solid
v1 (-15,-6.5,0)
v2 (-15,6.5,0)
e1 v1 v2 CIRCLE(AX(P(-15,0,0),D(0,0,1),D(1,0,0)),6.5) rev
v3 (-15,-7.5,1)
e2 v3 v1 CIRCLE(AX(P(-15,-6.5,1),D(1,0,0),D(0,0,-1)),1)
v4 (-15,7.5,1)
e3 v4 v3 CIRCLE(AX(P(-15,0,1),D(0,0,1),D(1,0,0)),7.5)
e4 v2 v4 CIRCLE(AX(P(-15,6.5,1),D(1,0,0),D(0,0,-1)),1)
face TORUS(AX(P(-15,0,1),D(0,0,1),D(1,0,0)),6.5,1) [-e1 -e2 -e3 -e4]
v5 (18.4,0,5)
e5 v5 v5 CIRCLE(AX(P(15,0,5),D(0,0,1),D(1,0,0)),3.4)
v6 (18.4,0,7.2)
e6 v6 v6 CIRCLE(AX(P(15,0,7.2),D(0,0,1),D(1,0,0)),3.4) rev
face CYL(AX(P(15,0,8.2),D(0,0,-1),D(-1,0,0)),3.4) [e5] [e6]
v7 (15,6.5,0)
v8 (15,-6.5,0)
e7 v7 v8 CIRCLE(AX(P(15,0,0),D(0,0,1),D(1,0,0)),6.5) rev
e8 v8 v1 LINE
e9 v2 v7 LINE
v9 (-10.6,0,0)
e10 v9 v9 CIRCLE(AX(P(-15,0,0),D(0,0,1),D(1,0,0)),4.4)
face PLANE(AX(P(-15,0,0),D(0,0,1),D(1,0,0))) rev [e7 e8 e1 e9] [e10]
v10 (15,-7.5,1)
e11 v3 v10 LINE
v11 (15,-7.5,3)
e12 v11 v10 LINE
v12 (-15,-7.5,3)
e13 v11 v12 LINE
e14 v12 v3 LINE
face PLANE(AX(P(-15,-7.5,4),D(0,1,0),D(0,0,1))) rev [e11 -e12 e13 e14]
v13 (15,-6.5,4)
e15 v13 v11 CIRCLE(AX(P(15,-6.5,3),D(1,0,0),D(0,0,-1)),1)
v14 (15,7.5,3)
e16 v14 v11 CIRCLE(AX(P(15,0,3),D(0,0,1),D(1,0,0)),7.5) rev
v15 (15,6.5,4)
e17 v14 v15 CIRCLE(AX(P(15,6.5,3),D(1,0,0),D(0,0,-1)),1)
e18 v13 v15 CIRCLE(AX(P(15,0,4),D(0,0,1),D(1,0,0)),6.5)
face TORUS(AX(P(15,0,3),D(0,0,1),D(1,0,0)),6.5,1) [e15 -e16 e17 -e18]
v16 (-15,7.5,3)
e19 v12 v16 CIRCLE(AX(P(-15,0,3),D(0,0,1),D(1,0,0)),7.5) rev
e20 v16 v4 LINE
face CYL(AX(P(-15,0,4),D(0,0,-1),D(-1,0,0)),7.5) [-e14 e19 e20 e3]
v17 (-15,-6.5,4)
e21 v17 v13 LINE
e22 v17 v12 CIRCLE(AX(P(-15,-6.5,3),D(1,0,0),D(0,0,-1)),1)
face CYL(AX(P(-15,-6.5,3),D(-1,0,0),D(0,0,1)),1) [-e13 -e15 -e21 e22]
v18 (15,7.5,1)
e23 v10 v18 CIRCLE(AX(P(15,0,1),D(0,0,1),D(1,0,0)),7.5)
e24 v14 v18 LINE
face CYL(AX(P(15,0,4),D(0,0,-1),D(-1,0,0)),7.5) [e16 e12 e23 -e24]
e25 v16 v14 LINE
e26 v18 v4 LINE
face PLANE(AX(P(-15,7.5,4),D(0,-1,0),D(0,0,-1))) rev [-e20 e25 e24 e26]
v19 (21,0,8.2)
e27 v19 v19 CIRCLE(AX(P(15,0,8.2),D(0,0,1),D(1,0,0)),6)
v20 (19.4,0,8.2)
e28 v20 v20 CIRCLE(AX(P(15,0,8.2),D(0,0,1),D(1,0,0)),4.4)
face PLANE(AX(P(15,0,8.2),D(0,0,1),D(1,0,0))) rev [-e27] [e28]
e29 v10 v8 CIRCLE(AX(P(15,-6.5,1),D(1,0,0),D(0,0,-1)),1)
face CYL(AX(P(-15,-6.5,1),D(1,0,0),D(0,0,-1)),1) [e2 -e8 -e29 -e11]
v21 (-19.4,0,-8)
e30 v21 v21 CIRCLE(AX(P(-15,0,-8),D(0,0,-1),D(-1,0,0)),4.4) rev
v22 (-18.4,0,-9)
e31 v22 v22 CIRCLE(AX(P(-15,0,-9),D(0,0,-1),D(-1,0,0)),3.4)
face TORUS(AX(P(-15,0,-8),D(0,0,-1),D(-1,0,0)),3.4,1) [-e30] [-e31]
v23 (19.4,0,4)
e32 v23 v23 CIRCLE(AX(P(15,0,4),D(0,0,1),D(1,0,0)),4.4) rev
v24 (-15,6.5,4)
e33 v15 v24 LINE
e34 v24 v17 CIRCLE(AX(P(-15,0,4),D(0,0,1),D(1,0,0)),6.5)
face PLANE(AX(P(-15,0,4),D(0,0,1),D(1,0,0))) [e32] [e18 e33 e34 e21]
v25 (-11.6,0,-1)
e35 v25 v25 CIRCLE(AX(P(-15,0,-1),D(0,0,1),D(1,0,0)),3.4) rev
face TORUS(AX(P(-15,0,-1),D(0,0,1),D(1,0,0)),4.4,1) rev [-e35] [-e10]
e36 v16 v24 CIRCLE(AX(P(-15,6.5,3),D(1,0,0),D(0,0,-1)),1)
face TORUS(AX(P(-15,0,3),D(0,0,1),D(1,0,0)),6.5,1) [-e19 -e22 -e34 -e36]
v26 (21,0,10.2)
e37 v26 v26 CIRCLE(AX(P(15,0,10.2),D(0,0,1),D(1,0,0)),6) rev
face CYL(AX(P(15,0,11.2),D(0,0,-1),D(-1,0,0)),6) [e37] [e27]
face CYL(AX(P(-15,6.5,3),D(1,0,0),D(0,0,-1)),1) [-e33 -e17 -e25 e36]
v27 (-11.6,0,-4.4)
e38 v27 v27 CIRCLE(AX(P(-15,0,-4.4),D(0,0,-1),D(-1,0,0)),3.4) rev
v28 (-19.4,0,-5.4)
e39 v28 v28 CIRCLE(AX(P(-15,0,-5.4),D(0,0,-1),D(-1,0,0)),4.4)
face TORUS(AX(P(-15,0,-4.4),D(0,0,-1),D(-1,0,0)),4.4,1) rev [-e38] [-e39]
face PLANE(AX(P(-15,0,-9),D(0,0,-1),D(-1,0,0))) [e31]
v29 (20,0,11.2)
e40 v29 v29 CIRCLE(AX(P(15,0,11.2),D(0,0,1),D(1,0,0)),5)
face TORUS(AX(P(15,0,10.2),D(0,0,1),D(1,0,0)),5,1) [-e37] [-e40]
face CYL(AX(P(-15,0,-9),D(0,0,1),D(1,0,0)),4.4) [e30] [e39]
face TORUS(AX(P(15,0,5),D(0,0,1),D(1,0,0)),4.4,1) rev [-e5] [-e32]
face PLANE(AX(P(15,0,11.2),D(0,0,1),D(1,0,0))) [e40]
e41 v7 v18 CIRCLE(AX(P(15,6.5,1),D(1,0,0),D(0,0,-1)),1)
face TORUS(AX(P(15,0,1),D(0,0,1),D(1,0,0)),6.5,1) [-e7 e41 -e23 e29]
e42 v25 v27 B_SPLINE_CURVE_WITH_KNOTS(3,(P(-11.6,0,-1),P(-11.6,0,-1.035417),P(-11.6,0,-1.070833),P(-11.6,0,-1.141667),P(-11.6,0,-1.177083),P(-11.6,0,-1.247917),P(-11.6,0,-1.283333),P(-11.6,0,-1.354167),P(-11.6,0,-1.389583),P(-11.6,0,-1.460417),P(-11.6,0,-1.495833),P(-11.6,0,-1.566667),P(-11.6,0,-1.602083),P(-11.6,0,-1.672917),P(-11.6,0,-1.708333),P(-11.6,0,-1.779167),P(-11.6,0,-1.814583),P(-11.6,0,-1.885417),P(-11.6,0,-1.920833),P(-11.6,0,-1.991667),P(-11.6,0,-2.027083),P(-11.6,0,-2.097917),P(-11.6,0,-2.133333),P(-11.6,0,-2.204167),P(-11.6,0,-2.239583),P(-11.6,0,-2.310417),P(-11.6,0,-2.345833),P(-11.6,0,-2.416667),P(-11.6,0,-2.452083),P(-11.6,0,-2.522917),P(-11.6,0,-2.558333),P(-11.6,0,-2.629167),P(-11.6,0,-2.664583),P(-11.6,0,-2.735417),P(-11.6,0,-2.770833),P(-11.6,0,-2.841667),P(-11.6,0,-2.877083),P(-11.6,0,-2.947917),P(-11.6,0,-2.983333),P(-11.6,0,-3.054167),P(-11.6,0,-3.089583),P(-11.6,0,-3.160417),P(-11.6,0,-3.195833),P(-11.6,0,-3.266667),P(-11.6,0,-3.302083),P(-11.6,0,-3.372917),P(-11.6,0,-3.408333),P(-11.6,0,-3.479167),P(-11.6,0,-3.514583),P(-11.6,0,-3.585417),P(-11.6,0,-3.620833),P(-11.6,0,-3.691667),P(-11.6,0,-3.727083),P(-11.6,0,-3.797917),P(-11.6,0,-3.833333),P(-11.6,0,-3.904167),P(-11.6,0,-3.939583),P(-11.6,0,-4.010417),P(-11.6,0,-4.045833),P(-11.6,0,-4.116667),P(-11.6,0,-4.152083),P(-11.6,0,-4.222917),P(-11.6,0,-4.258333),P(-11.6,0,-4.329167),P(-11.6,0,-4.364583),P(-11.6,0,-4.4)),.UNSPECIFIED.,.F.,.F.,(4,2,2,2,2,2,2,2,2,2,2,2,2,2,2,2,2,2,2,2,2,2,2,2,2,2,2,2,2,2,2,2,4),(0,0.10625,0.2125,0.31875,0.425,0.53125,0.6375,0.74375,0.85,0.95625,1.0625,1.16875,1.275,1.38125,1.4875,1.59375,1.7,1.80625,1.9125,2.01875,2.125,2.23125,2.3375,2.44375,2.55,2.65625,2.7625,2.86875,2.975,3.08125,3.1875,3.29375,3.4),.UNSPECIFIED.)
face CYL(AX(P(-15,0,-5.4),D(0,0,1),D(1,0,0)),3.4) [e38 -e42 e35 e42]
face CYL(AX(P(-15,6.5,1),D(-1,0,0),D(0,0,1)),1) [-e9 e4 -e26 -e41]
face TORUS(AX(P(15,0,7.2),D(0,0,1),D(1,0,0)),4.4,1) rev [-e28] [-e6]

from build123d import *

# Parameters (mm, degrees)
SKETCH1_R           = 3.5
BOSS_EXTRUDE2_DEPTH = 4
SKETCH2_R           = 3.4
BOSS_EXTRUDE3_DEPTH = 5.4
SKETCH4_R           = 4.4
BOSS_EXTRUDE4_DEPTH = 3.6
SKETCH5_R           = 3.5
BOSS_EXTRUDE5_DEPTH = 4
SKETCH6_R           = 3.4
BOSS_EXTRUDE6_DEPTH = 4.2
SKETCH7_R           = 6
BOSS_EXTRUDE7_DEPTH = 3
FILLET1_R           = 1


with BuildPart() as part:
    # Sketch1 → Boss-Extrude2 (new body)
    with BuildSketch(Plane.XY):
        with BuildLine():
            Line((-15, 7.5), (15, 7.5))
            ThreePointArc((15, 7.5), (22.5, 0), (15, -7.5))
            Line((15, -7.5), (-15, -7.5))
            ThreePointArc((-15, -7.5), (-22.5, 0), (-15, 7.5))
        make_face()
        with Locations((15, 0)):
            Circle(SKETCH1_R, mode=Mode.SUBTRACT)
    extrude(amount=BOSS_EXTRUDE2_DEPTH)

    # Sketch2 → Boss-Extrude3 (add)
    with BuildSketch(Plane(origin=(0, 0, 0), x_dir=(-1, 0, 0), z_dir=(0, 0, -1))):
        with Locations(Location((15, 0, 0), (0, 0, 180))):
            Circle(SKETCH2_R)
    extrude(amount=BOSS_EXTRUDE3_DEPTH)

    # Sketch4 → Boss-Extrude4 (add)
    with BuildSketch(Plane(origin=(0, 0, -5.4), x_dir=(-1, 0, 0), z_dir=(0, 0, -1))):
        with Locations((15, 0)):
            Circle(SKETCH4_R)
    extrude(amount=BOSS_EXTRUDE4_DEPTH)

    # Sketch5 → Boss-Extrude5 (add)
    with BuildSketch(Plane(origin=(0, 0, 0), x_dir=(-1, 0, 0), z_dir=(0, 0, -1))):
        with Locations((-15, 0)):
            Circle(SKETCH5_R)
    extrude(amount=-BOSS_EXTRUDE5_DEPTH)

    # Sketch6 → Boss-Extrude6 (add)
    with BuildSketch(Plane.XY.offset(4)):
        with Locations((15, 0)):
            Circle(SKETCH6_R)
    extrude(amount=BOSS_EXTRUDE6_DEPTH)

    # Sketch7 → Boss-Extrude7 (add)
    with BuildSketch(Plane.XY.offset(8.2)):
        with Locations((15, 0)):
            Circle(SKETCH7_R)
    extrude(amount=BOSS_EXTRUDE7_DEPTH)

    # Fillet1
    fillet1_edges = [part.edges().sort_by_distance(p)[0] for p in [
        (22.5, 0, 4),
        (0, 7.5, 4),
        (-18.4, 0, 0),
        (-18.4, 0, -5.4),
        (-10.6, 0, -9),
        (11.6, 0, 4),
        (11.6, 0, 8.2),
        (9, 0, 11.2),
        (-22.5, 0, 4),
        (0, 7.5, 0),
        (22.5, 0, 0),
        (0, -7.5, 0),
        (-22.5, 0, 0),
        (0, -7.5, 4),
    ]]
    fillet(fillet1_edges, radius=FILLET1_R - 0.0001)  # a hair under: the kernel refuses the full size


solid = part.part
